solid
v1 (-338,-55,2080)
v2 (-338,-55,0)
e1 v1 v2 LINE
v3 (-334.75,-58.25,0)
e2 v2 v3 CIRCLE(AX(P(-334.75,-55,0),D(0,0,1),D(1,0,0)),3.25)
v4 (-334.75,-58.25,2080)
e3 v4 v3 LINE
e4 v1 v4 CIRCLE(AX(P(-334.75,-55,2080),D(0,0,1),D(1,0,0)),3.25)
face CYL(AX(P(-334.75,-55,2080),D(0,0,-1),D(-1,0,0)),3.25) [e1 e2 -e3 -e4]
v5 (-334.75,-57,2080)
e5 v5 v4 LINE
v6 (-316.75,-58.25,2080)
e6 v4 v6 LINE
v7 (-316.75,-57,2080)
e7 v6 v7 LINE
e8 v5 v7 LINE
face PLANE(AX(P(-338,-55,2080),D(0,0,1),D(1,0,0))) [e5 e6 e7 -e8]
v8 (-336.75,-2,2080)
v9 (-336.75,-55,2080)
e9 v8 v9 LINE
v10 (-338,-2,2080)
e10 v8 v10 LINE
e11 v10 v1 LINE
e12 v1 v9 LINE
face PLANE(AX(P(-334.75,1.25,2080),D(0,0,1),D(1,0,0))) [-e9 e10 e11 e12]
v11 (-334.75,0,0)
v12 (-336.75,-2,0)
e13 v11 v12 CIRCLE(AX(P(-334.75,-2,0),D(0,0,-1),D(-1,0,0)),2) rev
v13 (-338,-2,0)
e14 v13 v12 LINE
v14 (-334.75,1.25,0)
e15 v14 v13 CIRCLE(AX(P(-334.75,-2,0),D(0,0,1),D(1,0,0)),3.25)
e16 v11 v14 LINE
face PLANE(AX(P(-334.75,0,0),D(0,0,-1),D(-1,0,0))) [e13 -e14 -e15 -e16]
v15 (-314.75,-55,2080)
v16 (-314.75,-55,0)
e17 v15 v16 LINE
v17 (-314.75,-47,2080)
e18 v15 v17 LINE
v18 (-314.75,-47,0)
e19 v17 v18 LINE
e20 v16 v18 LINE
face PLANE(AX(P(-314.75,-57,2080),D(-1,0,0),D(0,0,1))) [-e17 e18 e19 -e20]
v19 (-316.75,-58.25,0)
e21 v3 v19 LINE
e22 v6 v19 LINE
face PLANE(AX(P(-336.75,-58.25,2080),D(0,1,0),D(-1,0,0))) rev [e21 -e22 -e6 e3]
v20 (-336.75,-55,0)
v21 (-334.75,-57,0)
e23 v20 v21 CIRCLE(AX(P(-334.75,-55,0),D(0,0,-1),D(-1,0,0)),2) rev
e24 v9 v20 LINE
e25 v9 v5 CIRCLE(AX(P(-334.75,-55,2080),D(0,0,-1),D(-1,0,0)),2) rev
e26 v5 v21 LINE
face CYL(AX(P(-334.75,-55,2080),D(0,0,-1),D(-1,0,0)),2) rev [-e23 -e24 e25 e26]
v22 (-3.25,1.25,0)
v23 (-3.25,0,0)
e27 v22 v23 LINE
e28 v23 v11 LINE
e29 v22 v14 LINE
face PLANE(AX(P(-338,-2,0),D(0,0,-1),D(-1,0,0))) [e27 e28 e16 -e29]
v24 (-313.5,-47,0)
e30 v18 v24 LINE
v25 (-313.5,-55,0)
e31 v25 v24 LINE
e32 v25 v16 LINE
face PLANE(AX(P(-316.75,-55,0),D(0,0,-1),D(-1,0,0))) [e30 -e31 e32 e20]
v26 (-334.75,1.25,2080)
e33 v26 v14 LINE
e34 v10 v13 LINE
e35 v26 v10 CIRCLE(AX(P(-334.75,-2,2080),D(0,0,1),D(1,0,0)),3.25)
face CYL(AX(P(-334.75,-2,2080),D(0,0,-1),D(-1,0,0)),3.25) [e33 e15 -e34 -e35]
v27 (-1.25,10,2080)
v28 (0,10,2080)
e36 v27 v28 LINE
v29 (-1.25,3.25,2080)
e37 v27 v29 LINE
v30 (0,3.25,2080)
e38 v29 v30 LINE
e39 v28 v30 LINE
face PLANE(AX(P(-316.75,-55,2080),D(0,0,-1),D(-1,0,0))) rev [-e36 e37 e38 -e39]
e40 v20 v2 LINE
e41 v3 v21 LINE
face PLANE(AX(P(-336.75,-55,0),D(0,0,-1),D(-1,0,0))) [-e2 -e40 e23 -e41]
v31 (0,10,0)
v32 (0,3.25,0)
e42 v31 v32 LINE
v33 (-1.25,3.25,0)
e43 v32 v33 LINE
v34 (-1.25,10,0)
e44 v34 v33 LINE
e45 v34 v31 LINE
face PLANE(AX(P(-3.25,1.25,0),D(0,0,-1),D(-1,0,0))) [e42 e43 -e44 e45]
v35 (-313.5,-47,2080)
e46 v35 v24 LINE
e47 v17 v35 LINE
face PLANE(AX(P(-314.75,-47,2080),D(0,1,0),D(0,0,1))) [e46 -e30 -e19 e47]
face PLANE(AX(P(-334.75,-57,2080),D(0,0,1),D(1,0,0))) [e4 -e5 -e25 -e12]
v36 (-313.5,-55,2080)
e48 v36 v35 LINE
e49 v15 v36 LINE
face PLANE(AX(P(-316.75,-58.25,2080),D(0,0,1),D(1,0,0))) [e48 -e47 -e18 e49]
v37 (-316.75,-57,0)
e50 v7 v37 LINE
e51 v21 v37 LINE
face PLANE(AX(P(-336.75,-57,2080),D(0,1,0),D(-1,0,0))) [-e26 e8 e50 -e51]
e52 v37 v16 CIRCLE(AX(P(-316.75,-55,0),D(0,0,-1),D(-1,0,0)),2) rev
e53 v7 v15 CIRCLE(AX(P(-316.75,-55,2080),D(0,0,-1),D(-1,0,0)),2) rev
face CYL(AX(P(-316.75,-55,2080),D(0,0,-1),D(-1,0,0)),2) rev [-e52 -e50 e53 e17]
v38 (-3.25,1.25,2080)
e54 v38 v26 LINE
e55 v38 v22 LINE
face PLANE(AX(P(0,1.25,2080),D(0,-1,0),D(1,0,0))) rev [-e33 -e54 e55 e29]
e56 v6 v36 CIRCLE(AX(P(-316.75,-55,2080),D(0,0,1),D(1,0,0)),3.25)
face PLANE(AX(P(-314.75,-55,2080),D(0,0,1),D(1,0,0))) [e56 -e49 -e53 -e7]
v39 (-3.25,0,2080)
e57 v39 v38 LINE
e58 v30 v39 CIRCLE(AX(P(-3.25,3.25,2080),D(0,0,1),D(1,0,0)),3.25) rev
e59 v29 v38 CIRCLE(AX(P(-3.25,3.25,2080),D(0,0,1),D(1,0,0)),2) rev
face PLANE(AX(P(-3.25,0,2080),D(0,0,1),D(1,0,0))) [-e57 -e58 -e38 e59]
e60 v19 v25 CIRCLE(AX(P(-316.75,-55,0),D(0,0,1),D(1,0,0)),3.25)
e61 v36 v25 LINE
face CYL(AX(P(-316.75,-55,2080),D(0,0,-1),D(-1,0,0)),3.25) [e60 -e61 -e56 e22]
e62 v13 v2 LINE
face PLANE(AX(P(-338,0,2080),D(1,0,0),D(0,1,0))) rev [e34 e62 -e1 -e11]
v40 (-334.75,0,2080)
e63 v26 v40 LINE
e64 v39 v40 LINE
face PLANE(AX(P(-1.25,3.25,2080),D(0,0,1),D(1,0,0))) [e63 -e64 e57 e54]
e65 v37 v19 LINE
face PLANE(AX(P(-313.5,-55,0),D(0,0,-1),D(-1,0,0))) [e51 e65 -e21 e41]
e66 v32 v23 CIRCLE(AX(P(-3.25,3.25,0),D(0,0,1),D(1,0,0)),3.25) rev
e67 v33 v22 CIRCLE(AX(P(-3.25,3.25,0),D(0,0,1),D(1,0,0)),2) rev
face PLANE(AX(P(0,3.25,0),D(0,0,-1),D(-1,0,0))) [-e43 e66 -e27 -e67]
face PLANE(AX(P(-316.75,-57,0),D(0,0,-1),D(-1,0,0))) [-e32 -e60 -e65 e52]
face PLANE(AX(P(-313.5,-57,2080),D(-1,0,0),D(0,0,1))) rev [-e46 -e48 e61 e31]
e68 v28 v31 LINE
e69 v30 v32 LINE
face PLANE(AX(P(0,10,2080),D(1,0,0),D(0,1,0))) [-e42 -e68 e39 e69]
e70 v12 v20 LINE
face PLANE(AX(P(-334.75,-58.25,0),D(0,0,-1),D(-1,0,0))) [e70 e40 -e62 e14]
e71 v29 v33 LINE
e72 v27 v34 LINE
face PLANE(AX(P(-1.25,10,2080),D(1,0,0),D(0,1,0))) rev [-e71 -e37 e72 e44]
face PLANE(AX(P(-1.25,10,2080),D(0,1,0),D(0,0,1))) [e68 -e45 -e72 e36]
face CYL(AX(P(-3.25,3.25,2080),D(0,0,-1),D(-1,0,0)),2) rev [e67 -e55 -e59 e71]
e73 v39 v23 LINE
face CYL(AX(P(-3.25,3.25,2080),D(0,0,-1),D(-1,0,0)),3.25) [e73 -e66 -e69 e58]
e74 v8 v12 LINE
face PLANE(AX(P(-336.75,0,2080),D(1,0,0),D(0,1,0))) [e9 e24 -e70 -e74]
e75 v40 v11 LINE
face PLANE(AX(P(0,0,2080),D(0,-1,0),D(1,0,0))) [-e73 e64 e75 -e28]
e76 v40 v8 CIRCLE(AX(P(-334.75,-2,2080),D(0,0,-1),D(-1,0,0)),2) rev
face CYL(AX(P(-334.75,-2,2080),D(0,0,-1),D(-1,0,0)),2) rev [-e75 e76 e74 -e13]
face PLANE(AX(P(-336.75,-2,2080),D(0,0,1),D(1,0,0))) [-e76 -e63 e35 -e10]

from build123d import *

# Parameters (mm, degrees)
BASE_FLANGE1_DEPTH = 2080


# Sheet-metal steps are written as plain solids
with BuildPart() as part:
    # Sketch1 → Base-Flange1 (new body)
    with BuildSketch(Plane.XY):
        with BuildLine():
            Line((0, 10), (0, 3.25))
            ThreePointArc((0, 3.25), (-0.951902961, 0.951902961), (-3.25, 0))
            Line((-3.25, 0), (-334.75, 0))
            ThreePointArc((-334.75, 0), (-336.164213562, -0.585786438), (-336.75, -2))
            Line((-336.75, -2), (-336.75, -55))
            ThreePointArc((-336.75, -55), (-336.164213562, -56.414213562), (-334.75, -57))
            Line((-334.75, -57), (-316.75, -57))
            ThreePointArc((-316.75, -57), (-315.335786438, -56.414213562), (-314.75, -55))
            Line((-314.75, -55), (-314.75, -47))
            Line((-314.75, -47), (-313.5, -47))
            Line((-313.5, -47), (-313.5, -55))
            ThreePointArc((-313.5, -55), (-314.451902961, -57.298097039), (-316.75, -58.25))
            Line((-316.75, -58.25), (-334.75, -58.25))
            ThreePointArc((-334.75, -58.25), (-337.048097039, -57.298097039), (-338, -55))
            Line((-338, -55), (-338, -2))
            ThreePointArc((-338, -2), (-337.048097039, 0.298097039), (-334.75, 1.25))
            Line((-334.75, 1.25), (-3.25, 1.25))
            ThreePointArc((-3.25, 1.25), (-1.835786438, 1.835786438), (-1.25, 3.25))
            Line((-1.25, 3.25), (-1.25, 10))
            Line((-1.25, 10), (0, 10))
        make_face()
    extrude(amount=BASE_FLANGE1_DEPTH)


solid = part.part
